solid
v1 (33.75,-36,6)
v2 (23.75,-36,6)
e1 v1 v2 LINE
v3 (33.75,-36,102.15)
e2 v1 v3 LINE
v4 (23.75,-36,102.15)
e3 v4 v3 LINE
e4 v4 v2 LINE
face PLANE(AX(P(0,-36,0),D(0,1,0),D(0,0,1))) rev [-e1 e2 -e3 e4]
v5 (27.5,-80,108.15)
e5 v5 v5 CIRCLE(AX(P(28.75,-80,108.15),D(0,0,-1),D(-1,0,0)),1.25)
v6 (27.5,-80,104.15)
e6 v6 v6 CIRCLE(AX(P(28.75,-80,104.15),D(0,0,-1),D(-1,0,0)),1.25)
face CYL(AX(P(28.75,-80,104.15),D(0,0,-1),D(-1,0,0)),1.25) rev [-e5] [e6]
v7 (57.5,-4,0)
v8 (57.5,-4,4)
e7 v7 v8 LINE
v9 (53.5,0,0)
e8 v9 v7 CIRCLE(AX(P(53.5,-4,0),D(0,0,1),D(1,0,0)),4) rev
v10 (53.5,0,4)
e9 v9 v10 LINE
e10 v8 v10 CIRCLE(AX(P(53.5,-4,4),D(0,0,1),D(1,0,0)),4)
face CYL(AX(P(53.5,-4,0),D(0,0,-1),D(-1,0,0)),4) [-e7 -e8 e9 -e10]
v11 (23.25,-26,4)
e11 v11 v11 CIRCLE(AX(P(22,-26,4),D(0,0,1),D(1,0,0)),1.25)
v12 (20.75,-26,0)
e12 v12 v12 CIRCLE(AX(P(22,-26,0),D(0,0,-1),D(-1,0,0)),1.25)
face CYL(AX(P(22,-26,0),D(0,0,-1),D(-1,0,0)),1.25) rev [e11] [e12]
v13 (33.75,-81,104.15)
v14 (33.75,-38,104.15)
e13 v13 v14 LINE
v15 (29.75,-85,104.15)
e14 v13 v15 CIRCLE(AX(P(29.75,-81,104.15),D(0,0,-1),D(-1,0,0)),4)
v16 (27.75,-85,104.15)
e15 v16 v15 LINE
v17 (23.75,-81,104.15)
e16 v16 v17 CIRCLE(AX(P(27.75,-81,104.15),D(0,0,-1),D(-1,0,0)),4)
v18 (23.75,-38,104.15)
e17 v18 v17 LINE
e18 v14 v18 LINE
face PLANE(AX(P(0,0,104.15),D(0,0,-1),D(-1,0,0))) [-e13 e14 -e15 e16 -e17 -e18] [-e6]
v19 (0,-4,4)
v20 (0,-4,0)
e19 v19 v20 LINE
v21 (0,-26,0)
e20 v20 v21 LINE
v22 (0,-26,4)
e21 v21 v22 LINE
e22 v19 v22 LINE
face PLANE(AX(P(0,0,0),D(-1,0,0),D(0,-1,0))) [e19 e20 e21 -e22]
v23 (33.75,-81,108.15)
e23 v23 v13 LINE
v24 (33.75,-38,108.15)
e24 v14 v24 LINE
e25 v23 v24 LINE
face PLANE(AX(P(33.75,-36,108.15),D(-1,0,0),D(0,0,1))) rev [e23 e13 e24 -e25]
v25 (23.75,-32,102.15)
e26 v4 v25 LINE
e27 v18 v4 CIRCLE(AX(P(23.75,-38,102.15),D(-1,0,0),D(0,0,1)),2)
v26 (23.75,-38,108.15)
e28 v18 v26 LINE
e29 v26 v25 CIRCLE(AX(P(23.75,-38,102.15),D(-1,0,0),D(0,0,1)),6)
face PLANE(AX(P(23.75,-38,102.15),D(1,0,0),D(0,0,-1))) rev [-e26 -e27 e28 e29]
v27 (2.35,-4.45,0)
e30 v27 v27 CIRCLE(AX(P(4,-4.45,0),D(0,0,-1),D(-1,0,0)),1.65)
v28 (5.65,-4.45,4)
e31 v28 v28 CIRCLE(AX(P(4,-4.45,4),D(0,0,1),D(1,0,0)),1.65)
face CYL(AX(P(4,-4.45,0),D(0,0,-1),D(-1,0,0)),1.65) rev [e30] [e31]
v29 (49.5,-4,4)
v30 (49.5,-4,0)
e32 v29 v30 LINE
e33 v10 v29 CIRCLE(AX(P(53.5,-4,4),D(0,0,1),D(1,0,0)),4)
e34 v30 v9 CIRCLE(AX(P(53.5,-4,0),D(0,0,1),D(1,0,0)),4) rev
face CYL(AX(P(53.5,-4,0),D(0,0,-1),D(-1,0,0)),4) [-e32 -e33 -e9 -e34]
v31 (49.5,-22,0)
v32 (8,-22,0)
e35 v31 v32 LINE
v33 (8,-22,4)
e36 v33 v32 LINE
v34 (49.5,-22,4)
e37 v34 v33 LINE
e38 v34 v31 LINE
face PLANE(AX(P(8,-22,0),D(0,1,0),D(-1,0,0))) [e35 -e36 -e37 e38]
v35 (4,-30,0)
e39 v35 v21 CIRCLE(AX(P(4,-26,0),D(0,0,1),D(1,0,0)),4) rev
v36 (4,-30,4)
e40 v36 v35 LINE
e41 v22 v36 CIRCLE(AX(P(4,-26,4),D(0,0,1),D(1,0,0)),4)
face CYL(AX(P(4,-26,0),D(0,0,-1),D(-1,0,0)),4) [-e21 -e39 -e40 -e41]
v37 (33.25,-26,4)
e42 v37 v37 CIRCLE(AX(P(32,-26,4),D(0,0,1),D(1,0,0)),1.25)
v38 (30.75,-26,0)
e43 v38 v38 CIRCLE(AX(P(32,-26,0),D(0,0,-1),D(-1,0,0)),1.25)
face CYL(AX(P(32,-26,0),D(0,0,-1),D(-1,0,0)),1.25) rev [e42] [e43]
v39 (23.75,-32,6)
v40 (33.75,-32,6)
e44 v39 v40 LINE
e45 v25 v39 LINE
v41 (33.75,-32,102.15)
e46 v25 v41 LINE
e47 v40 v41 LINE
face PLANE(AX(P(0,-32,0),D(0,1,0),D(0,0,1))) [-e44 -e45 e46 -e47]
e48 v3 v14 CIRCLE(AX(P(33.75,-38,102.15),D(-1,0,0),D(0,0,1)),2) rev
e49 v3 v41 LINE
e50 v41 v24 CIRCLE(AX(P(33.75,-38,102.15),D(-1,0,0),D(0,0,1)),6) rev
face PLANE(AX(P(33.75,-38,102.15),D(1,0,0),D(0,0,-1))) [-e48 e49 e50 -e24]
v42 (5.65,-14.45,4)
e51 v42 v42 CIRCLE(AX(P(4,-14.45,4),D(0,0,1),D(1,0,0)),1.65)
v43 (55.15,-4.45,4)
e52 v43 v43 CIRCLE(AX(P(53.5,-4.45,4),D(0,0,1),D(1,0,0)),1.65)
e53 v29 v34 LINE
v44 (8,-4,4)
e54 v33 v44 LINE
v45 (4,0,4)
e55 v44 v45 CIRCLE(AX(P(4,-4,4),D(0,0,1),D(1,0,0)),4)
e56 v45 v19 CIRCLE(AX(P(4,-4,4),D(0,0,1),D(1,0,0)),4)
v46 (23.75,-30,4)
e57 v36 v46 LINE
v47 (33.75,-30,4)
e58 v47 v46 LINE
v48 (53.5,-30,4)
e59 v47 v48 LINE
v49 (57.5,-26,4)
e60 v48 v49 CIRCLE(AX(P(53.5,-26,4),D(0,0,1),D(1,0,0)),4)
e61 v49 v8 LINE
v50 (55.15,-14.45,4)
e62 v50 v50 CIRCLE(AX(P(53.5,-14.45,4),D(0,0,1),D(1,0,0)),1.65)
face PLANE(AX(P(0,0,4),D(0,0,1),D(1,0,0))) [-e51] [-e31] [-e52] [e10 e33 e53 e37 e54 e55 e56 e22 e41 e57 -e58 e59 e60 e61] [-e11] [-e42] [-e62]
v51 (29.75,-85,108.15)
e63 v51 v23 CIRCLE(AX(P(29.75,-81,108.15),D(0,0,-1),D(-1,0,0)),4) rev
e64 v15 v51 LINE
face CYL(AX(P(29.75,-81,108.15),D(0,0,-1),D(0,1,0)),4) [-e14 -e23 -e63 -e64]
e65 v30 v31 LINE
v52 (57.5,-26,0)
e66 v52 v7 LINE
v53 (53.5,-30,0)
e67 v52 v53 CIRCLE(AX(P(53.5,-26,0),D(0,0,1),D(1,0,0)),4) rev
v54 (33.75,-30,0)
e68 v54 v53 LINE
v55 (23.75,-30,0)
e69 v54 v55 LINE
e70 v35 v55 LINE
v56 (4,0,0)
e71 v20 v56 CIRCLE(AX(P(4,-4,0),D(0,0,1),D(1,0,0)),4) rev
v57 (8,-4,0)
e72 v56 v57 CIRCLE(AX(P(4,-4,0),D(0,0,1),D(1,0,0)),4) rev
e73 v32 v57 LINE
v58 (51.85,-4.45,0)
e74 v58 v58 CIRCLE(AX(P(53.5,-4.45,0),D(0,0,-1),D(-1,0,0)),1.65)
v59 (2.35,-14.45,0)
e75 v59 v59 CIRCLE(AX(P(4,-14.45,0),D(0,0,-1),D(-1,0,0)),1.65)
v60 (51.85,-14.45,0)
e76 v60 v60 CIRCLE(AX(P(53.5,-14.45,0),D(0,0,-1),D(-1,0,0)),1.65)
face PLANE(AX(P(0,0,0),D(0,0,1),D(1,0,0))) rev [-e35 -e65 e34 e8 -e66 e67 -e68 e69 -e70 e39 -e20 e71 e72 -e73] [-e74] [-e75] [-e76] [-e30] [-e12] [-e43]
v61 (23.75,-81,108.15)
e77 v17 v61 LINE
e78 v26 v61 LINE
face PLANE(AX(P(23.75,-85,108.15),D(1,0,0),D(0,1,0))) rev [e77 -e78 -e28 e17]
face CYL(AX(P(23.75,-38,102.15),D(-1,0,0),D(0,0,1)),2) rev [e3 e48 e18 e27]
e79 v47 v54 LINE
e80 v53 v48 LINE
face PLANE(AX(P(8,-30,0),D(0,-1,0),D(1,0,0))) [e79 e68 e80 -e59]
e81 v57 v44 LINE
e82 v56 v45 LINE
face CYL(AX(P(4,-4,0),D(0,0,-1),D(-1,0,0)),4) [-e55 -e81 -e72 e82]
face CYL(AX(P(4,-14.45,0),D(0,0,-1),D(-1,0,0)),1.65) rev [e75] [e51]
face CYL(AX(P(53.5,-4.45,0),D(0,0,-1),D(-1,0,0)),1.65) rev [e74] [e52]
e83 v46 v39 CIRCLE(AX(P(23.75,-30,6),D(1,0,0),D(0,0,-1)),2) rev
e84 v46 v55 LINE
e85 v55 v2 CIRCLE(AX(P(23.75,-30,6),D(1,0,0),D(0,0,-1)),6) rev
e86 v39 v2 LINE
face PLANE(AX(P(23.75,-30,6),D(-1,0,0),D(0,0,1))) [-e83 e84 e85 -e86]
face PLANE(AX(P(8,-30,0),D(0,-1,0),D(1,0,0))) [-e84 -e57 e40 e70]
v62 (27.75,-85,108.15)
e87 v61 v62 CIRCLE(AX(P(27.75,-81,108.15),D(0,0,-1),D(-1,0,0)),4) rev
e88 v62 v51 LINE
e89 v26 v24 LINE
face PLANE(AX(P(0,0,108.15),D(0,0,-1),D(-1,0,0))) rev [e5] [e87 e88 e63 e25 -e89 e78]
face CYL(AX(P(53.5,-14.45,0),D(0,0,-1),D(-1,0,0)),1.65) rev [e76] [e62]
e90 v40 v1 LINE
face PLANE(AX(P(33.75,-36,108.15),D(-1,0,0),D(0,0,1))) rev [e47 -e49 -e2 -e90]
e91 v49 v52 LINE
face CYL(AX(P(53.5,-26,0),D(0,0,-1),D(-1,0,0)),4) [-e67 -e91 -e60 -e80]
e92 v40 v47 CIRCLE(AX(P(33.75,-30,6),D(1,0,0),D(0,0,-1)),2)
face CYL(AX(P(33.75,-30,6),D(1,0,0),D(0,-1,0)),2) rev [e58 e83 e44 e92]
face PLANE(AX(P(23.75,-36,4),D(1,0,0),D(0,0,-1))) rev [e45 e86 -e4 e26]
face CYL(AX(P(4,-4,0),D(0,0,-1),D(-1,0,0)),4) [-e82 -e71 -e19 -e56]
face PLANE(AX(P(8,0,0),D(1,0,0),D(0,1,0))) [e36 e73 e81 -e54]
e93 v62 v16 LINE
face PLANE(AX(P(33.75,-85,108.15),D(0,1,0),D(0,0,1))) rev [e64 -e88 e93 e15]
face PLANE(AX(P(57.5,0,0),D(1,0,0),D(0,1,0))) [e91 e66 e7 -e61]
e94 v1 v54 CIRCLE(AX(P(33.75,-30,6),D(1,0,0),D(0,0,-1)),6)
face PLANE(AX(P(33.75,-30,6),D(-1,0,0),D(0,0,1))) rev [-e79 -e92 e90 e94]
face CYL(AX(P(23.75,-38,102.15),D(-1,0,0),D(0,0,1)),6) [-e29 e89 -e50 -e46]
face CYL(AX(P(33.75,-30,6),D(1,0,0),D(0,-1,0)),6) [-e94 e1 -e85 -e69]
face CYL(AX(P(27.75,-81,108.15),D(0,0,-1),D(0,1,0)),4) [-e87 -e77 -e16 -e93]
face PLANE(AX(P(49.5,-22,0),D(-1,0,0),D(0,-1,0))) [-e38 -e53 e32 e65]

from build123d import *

# Parameters (mm, degrees)
EXTRUDE_1_DEPTH                  = 3
SHEET_METAL_1_OUTLINE_W          = 8
SHEET_METAL_1_OUTLINE_H          = 1
SHEET_METAL_1_DEPTH              = 57.5
SHEET_METAL_1_2_OUTLINE_W        = 22
SHEET_METAL_1_2_OUTLINE_H        = 1
SHEET_METAL_1_2_DEPTH            = 8
SHEET_START                      = 49.5
SHEET_METAL_1_3_OUTLINE_W        = 22
SHEET_METAL_1_3_OUTLINE_H        = 1
SHEET_METAL_1_3_DEPTH            = 8
SM_EDGE_FLANGE_1_DEPTH           = 10
SM_EDGE_FLANGE_2_STRIP_W         = 20
SM_EDGE_FLANGE_2_STRIP_H         = 4
SM_EDGE_FLANGE_2_STRIP_CUT_DEPTH = 10
SM_EDGE_FLANGE_2_DEPTH           = 10
FILLET_1_R                       = 4
M4X0_7_1_D                       = 3.3
M3X0_5_1_D                       = 2.5
M3X0_5_2_D                       = 2.5


# Read off the part's stored shape, not the designer's step: 轉換-實體1
# Sheet-metal steps are written as plain solids
with BuildPart() as part:
    # Sketch 1 → 填料-伸長1 (new body)
    with BuildSketch(Plane.XY):
        Polygon((8, 0), (8, -22), (49.5, -22), (49.5, 0), (57.5, 0), (57.5, -30), (8, -30), (0, -30), (0, 0), align=None)
    extrude(amount=EXTRUDE_1_DEPTH)

    # Sheet Metal 1 outline → Sheet Metal 1 (add)
    with BuildSketch(Plane.YZ):
        with Locations((-26, 3.5)):
            Rectangle(SHEET_METAL_1_OUTLINE_W, SHEET_METAL_1_OUTLINE_H)
    extrude(amount=SHEET_METAL_1_DEPTH)

    # Sheet Metal 1 2 outline → Sheet Metal 1 2 (add)
    with BuildSketch(Plane.YZ):
        with Locations((-11, 3.5)):
            Rectangle(SHEET_METAL_1_2_OUTLINE_W, SHEET_METAL_1_2_OUTLINE_H)
    extrude(amount=SHEET_METAL_1_2_DEPTH)

    # Sheet Metal 1 3 outline → Sheet Metal 1 3 (add)
    with BuildSketch(Plane.YZ.offset(SHEET_START)):
        with Locations((-11, 3.5)):
            Rectangle(SHEET_METAL_1_3_OUTLINE_W, SHEET_METAL_1_3_OUTLINE_H)
    extrude(amount=SHEET_METAL_1_3_DEPTH)

    # 邊線-凸緣1 section (across the edge) → 邊線-凸緣1 (add)
    with BuildSketch(Plane(origin=(23.75, -32, 4), x_dir=(0, 1, 0), z_dir=(1, 0, 0))):
        with BuildLine():
            Line((-4, 2), (-4, 104.15))
            Line((-4, 104.15), (0, 104.15))
            Line((0, 104.15), (0, 2))
            ThreePointArc((0, 2), (0.585786438, 0.585786438), (2, 0))
            Line((2, 0), (2, -4))
            ThreePointArc((2, -4), (-2.242640687, -2.242640687), (-4, 2))
        make_face()
    extrude(amount=SM_EDGE_FLANGE_1_DEPTH)

    # 邊線-凸緣2 strip (across the edge) → 邊線-凸緣2 strip cut (cut)
    with BuildSketch(Plane(origin=(33.75, -36, 108.15), x_dir=(0, 0, -1), z_dir=(-1, 0, 0))):
        with Locations((-4, -2)):
            Rectangle(SM_EDGE_FLANGE_2_STRIP_W, SM_EDGE_FLANGE_2_STRIP_H)
    extrude(amount=SM_EDGE_FLANGE_2_STRIP_CUT_DEPTH, mode=Mode.SUBTRACT)

    # 邊線-凸緣2 section (across the edge) → 邊線-凸緣2 (add)
    with BuildSketch(Plane(origin=(33.75, -36, 108.15), x_dir=(0, 0, -1), z_dir=(-1, 0, 0))):
        with BuildLine():
            Line((0, 2), (0, 49))
            Line((0, 49), (4, 49))
            Line((4, 49), (4, 2))
            ThreePointArc((4, 2), (4.585786438, 0.585786438), (6, 0))
            Line((6, 0), (6, -4))
            ThreePointArc((6, -4), (1.757359313, -2.242640687), (0, 2))
        make_face()
    extrude(amount=SM_EDGE_FLANGE_2_DEPTH)

    # 圓角1
    fillet_1_edges = [part.edges().sort_by_distance(p)[0] for p in [
        (0, -30, 2),
        (57.5, -30, 2),
        (57.5, 0, 2),
        (49.5, 0, 2),
        (8, 0, 2),
        (0, 0, 2),
        (33.75, -85, 106.15),
        (23.75, -85, 106.15),
    ]]
    fillet(fillet_1_edges, radius=FILLET_1_R - 0.0001)  # a hair under: the kernel refuses the full size

    # M4x0.7 螺紋孔1 (through all)
    with Locations(Plane(origin=(53.5, -4.45, 0), x_dir=(-1, 0, 0), z_dir=(0, 0, -1))):
        with Locations((0, 0), (0, -10), (49.5, -10), (49.5, 0)):
            Hole(M4X0_7_1_D / 2)

    # M3x0.5 螺紋孔1 (through all)
    with Locations(Plane(origin=(28.75, -80, 104.15), x_dir=(-1, 0, 0), z_dir=(0, 0, -1))):
        with Locations((0, 0)):
            Hole(M3X0_5_1_D / 2)

    # M3x0.5 螺紋孔2 (through all)
    with Locations(Plane(origin=(22, -26, 0), x_dir=(-1, 0, 0), z_dir=(0, 0, -1))):
        with Locations((0, 0), (-10, 0)):
            Hole(M3X0_5_2_D / 2)


solid = part.part
